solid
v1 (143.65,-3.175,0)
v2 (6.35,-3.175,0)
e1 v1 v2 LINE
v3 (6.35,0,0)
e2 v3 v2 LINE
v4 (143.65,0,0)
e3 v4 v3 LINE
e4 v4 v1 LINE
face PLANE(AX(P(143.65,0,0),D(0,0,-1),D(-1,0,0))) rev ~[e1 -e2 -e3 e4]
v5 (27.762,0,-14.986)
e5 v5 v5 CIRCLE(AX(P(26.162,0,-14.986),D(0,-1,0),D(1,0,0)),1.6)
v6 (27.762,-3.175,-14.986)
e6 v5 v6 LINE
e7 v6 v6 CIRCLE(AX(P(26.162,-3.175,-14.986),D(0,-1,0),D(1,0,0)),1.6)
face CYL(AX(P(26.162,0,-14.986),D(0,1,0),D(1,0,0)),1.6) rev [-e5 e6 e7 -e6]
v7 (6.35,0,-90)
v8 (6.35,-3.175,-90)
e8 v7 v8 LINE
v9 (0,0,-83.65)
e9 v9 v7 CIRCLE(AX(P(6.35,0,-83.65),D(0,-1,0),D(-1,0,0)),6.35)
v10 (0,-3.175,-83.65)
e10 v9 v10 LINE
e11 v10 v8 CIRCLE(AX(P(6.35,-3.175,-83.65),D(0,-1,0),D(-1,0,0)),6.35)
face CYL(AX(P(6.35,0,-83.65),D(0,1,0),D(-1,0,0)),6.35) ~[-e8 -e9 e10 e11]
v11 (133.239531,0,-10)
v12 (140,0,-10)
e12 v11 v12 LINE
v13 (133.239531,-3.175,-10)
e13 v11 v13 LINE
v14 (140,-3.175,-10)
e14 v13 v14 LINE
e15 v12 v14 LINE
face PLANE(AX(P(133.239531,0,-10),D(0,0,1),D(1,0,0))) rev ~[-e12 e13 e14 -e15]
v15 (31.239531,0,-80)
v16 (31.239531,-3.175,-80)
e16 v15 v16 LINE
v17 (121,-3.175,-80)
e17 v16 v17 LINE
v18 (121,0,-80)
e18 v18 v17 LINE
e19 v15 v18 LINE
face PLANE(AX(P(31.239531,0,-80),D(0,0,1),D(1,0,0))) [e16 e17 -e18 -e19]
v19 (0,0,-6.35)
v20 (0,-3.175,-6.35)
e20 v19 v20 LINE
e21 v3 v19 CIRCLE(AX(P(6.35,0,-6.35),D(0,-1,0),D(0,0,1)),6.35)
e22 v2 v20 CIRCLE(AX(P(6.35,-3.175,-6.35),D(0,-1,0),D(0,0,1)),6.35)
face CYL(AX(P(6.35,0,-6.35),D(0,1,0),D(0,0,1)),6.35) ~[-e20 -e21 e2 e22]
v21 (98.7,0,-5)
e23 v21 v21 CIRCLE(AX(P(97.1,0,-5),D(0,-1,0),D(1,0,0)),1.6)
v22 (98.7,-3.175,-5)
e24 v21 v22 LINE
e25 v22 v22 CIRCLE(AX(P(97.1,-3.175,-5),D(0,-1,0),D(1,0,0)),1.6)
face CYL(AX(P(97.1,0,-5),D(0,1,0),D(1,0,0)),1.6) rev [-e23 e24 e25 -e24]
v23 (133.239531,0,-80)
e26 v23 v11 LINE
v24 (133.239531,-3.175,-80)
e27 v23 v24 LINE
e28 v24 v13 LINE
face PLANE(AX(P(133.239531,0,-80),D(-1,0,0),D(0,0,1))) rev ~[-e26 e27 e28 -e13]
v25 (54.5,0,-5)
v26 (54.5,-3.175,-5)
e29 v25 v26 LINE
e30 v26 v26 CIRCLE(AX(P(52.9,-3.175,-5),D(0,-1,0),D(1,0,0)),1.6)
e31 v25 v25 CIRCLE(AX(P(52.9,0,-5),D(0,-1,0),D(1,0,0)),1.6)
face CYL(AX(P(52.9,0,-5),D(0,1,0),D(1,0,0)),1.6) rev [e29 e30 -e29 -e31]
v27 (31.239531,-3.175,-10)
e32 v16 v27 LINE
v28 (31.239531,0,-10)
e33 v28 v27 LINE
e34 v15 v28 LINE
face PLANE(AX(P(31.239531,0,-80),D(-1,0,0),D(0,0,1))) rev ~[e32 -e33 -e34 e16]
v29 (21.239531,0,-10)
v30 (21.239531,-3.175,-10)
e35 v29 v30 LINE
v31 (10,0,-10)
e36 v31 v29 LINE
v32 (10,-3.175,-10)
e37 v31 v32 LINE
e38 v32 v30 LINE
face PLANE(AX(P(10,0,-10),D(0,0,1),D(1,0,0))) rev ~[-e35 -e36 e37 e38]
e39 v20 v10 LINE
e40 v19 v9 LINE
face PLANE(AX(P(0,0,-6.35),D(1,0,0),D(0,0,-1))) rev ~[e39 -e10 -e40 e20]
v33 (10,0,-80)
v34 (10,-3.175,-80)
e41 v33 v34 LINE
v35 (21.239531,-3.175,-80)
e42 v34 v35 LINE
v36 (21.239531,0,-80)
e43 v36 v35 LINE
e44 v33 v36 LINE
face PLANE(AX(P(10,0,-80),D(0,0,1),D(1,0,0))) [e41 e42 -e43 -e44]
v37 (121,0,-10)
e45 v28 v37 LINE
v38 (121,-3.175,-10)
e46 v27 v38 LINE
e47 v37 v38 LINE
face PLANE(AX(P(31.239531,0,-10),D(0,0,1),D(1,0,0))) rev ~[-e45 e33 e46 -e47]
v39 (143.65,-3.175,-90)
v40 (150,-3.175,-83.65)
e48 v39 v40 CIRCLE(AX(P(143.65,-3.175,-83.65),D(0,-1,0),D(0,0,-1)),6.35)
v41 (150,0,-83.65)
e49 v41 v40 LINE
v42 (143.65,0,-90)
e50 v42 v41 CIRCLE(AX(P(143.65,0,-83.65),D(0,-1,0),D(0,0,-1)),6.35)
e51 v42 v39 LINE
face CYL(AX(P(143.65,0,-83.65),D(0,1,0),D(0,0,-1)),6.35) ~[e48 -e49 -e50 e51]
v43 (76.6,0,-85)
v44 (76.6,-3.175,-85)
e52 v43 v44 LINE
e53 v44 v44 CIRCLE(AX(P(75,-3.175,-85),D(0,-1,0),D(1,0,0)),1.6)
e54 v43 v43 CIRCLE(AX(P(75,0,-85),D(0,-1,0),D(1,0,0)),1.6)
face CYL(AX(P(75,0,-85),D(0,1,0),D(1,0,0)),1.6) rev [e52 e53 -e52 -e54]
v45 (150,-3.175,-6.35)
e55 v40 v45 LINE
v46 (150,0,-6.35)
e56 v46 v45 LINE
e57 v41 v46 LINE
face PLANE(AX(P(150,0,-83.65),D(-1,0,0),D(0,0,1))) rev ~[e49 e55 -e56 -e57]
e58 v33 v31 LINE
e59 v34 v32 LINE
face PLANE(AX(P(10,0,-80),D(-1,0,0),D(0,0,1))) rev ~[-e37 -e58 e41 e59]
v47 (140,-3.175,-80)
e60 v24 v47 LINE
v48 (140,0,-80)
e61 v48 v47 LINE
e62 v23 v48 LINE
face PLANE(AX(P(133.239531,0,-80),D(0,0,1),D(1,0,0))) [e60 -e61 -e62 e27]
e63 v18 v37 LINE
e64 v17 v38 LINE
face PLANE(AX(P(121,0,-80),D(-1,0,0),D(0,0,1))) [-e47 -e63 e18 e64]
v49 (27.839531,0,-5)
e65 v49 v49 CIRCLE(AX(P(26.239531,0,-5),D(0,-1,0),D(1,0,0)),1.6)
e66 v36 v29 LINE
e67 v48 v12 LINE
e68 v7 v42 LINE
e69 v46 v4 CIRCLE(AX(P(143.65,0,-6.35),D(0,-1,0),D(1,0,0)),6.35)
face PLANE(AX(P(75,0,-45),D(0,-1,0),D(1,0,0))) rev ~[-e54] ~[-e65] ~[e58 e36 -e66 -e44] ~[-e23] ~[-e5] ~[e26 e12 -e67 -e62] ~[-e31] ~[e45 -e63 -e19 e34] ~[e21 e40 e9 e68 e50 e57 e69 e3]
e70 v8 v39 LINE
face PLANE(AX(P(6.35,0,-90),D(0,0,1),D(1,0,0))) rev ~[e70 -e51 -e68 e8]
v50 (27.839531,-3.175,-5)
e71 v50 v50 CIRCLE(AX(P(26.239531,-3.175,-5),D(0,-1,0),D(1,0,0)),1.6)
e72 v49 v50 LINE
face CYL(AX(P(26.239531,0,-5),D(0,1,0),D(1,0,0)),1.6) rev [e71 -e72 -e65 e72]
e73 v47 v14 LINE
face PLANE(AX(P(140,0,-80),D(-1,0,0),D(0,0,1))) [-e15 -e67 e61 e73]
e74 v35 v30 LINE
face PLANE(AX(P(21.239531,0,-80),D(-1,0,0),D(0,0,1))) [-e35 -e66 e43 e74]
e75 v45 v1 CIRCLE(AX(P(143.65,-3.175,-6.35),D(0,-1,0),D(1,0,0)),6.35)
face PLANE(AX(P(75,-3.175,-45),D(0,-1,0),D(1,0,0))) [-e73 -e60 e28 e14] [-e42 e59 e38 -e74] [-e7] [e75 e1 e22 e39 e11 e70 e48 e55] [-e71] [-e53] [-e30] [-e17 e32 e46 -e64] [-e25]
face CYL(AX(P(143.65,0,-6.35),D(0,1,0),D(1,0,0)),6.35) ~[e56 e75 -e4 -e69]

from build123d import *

# Parameters (mm, degrees)
F0_R     = 1.6
F0_W     = 11.2395305085
F0_H     = 70
F0_W_2   = 89.7604694915
F0_W_3   = 6.7604694915
F1_DEPTH = 3.175


# Not quite as in the source:
# - a length typed as a fraction of an inch, garbled in the dataset ("3 / 203.2 mm" for 3/8 in), is restored


with BuildPart() as f1:
    # F0 (on Front) → F1 (new body)
    with BuildSketch(Plane.XZ):
        with BuildLine():
            Line((21.2395305085, 0), (6.35, 0))
            ThreePointArc((6.35, 0), (1.8598719395, -1.8598719395), (0, -6.35))
            Line((0, -6.35), (0, -83.65))
            ThreePointArc((0, -83.65), (1.8598719395, -88.1401280605), (6.35, -90))
            Line((6.35, -90), (21.2395305085, -90))
            Line((21.2395305085, -90), (31.2395305085, -90))
            Line((31.2395305085, -90), (143.65, -90))
            ThreePointArc((143.65, -90), (148.1401280605, -88.1401280605), (150, -83.65))
            Line((150, -83.65), (150, -6.35))
            ThreePointArc((150, -6.35), (148.1401280605, -1.8598719395), (143.65, 0))
            Line((143.65, 0), (31.2395305085, 0))
            Line((31.2395305085, 0), (21.2395305085, 0))
        make_face()
        with Locations((75, -85)):
            Circle(F0_R, mode=Mode.SUBTRACT)
        with Locations((15.6197652543, -45)):
            Rectangle(F0_W, F0_H, mode=Mode.SUBTRACT)
        with Locations((26.162, -14.986)):
            Circle(F0_R, mode=Mode.SUBTRACT)
        with Locations((26.2395305085, -5)):
            Circle(F0_R, mode=Mode.SUBTRACT)
        with Locations((52.9, -5)):
            Circle(F0_R, mode=Mode.SUBTRACT)
        with Locations((76.1197652543, -45)):
            Rectangle(F0_W_2, F0_H, mode=Mode.SUBTRACT)
        with Locations((136.6197652543, -45)):
            Rectangle(F0_W_3, F0_H, mode=Mode.SUBTRACT)
        with Locations((97.1, -5)):
            Circle(F0_R, mode=Mode.SUBTRACT)
    extrude(amount=F1_DEPTH)


solid = f1.part
